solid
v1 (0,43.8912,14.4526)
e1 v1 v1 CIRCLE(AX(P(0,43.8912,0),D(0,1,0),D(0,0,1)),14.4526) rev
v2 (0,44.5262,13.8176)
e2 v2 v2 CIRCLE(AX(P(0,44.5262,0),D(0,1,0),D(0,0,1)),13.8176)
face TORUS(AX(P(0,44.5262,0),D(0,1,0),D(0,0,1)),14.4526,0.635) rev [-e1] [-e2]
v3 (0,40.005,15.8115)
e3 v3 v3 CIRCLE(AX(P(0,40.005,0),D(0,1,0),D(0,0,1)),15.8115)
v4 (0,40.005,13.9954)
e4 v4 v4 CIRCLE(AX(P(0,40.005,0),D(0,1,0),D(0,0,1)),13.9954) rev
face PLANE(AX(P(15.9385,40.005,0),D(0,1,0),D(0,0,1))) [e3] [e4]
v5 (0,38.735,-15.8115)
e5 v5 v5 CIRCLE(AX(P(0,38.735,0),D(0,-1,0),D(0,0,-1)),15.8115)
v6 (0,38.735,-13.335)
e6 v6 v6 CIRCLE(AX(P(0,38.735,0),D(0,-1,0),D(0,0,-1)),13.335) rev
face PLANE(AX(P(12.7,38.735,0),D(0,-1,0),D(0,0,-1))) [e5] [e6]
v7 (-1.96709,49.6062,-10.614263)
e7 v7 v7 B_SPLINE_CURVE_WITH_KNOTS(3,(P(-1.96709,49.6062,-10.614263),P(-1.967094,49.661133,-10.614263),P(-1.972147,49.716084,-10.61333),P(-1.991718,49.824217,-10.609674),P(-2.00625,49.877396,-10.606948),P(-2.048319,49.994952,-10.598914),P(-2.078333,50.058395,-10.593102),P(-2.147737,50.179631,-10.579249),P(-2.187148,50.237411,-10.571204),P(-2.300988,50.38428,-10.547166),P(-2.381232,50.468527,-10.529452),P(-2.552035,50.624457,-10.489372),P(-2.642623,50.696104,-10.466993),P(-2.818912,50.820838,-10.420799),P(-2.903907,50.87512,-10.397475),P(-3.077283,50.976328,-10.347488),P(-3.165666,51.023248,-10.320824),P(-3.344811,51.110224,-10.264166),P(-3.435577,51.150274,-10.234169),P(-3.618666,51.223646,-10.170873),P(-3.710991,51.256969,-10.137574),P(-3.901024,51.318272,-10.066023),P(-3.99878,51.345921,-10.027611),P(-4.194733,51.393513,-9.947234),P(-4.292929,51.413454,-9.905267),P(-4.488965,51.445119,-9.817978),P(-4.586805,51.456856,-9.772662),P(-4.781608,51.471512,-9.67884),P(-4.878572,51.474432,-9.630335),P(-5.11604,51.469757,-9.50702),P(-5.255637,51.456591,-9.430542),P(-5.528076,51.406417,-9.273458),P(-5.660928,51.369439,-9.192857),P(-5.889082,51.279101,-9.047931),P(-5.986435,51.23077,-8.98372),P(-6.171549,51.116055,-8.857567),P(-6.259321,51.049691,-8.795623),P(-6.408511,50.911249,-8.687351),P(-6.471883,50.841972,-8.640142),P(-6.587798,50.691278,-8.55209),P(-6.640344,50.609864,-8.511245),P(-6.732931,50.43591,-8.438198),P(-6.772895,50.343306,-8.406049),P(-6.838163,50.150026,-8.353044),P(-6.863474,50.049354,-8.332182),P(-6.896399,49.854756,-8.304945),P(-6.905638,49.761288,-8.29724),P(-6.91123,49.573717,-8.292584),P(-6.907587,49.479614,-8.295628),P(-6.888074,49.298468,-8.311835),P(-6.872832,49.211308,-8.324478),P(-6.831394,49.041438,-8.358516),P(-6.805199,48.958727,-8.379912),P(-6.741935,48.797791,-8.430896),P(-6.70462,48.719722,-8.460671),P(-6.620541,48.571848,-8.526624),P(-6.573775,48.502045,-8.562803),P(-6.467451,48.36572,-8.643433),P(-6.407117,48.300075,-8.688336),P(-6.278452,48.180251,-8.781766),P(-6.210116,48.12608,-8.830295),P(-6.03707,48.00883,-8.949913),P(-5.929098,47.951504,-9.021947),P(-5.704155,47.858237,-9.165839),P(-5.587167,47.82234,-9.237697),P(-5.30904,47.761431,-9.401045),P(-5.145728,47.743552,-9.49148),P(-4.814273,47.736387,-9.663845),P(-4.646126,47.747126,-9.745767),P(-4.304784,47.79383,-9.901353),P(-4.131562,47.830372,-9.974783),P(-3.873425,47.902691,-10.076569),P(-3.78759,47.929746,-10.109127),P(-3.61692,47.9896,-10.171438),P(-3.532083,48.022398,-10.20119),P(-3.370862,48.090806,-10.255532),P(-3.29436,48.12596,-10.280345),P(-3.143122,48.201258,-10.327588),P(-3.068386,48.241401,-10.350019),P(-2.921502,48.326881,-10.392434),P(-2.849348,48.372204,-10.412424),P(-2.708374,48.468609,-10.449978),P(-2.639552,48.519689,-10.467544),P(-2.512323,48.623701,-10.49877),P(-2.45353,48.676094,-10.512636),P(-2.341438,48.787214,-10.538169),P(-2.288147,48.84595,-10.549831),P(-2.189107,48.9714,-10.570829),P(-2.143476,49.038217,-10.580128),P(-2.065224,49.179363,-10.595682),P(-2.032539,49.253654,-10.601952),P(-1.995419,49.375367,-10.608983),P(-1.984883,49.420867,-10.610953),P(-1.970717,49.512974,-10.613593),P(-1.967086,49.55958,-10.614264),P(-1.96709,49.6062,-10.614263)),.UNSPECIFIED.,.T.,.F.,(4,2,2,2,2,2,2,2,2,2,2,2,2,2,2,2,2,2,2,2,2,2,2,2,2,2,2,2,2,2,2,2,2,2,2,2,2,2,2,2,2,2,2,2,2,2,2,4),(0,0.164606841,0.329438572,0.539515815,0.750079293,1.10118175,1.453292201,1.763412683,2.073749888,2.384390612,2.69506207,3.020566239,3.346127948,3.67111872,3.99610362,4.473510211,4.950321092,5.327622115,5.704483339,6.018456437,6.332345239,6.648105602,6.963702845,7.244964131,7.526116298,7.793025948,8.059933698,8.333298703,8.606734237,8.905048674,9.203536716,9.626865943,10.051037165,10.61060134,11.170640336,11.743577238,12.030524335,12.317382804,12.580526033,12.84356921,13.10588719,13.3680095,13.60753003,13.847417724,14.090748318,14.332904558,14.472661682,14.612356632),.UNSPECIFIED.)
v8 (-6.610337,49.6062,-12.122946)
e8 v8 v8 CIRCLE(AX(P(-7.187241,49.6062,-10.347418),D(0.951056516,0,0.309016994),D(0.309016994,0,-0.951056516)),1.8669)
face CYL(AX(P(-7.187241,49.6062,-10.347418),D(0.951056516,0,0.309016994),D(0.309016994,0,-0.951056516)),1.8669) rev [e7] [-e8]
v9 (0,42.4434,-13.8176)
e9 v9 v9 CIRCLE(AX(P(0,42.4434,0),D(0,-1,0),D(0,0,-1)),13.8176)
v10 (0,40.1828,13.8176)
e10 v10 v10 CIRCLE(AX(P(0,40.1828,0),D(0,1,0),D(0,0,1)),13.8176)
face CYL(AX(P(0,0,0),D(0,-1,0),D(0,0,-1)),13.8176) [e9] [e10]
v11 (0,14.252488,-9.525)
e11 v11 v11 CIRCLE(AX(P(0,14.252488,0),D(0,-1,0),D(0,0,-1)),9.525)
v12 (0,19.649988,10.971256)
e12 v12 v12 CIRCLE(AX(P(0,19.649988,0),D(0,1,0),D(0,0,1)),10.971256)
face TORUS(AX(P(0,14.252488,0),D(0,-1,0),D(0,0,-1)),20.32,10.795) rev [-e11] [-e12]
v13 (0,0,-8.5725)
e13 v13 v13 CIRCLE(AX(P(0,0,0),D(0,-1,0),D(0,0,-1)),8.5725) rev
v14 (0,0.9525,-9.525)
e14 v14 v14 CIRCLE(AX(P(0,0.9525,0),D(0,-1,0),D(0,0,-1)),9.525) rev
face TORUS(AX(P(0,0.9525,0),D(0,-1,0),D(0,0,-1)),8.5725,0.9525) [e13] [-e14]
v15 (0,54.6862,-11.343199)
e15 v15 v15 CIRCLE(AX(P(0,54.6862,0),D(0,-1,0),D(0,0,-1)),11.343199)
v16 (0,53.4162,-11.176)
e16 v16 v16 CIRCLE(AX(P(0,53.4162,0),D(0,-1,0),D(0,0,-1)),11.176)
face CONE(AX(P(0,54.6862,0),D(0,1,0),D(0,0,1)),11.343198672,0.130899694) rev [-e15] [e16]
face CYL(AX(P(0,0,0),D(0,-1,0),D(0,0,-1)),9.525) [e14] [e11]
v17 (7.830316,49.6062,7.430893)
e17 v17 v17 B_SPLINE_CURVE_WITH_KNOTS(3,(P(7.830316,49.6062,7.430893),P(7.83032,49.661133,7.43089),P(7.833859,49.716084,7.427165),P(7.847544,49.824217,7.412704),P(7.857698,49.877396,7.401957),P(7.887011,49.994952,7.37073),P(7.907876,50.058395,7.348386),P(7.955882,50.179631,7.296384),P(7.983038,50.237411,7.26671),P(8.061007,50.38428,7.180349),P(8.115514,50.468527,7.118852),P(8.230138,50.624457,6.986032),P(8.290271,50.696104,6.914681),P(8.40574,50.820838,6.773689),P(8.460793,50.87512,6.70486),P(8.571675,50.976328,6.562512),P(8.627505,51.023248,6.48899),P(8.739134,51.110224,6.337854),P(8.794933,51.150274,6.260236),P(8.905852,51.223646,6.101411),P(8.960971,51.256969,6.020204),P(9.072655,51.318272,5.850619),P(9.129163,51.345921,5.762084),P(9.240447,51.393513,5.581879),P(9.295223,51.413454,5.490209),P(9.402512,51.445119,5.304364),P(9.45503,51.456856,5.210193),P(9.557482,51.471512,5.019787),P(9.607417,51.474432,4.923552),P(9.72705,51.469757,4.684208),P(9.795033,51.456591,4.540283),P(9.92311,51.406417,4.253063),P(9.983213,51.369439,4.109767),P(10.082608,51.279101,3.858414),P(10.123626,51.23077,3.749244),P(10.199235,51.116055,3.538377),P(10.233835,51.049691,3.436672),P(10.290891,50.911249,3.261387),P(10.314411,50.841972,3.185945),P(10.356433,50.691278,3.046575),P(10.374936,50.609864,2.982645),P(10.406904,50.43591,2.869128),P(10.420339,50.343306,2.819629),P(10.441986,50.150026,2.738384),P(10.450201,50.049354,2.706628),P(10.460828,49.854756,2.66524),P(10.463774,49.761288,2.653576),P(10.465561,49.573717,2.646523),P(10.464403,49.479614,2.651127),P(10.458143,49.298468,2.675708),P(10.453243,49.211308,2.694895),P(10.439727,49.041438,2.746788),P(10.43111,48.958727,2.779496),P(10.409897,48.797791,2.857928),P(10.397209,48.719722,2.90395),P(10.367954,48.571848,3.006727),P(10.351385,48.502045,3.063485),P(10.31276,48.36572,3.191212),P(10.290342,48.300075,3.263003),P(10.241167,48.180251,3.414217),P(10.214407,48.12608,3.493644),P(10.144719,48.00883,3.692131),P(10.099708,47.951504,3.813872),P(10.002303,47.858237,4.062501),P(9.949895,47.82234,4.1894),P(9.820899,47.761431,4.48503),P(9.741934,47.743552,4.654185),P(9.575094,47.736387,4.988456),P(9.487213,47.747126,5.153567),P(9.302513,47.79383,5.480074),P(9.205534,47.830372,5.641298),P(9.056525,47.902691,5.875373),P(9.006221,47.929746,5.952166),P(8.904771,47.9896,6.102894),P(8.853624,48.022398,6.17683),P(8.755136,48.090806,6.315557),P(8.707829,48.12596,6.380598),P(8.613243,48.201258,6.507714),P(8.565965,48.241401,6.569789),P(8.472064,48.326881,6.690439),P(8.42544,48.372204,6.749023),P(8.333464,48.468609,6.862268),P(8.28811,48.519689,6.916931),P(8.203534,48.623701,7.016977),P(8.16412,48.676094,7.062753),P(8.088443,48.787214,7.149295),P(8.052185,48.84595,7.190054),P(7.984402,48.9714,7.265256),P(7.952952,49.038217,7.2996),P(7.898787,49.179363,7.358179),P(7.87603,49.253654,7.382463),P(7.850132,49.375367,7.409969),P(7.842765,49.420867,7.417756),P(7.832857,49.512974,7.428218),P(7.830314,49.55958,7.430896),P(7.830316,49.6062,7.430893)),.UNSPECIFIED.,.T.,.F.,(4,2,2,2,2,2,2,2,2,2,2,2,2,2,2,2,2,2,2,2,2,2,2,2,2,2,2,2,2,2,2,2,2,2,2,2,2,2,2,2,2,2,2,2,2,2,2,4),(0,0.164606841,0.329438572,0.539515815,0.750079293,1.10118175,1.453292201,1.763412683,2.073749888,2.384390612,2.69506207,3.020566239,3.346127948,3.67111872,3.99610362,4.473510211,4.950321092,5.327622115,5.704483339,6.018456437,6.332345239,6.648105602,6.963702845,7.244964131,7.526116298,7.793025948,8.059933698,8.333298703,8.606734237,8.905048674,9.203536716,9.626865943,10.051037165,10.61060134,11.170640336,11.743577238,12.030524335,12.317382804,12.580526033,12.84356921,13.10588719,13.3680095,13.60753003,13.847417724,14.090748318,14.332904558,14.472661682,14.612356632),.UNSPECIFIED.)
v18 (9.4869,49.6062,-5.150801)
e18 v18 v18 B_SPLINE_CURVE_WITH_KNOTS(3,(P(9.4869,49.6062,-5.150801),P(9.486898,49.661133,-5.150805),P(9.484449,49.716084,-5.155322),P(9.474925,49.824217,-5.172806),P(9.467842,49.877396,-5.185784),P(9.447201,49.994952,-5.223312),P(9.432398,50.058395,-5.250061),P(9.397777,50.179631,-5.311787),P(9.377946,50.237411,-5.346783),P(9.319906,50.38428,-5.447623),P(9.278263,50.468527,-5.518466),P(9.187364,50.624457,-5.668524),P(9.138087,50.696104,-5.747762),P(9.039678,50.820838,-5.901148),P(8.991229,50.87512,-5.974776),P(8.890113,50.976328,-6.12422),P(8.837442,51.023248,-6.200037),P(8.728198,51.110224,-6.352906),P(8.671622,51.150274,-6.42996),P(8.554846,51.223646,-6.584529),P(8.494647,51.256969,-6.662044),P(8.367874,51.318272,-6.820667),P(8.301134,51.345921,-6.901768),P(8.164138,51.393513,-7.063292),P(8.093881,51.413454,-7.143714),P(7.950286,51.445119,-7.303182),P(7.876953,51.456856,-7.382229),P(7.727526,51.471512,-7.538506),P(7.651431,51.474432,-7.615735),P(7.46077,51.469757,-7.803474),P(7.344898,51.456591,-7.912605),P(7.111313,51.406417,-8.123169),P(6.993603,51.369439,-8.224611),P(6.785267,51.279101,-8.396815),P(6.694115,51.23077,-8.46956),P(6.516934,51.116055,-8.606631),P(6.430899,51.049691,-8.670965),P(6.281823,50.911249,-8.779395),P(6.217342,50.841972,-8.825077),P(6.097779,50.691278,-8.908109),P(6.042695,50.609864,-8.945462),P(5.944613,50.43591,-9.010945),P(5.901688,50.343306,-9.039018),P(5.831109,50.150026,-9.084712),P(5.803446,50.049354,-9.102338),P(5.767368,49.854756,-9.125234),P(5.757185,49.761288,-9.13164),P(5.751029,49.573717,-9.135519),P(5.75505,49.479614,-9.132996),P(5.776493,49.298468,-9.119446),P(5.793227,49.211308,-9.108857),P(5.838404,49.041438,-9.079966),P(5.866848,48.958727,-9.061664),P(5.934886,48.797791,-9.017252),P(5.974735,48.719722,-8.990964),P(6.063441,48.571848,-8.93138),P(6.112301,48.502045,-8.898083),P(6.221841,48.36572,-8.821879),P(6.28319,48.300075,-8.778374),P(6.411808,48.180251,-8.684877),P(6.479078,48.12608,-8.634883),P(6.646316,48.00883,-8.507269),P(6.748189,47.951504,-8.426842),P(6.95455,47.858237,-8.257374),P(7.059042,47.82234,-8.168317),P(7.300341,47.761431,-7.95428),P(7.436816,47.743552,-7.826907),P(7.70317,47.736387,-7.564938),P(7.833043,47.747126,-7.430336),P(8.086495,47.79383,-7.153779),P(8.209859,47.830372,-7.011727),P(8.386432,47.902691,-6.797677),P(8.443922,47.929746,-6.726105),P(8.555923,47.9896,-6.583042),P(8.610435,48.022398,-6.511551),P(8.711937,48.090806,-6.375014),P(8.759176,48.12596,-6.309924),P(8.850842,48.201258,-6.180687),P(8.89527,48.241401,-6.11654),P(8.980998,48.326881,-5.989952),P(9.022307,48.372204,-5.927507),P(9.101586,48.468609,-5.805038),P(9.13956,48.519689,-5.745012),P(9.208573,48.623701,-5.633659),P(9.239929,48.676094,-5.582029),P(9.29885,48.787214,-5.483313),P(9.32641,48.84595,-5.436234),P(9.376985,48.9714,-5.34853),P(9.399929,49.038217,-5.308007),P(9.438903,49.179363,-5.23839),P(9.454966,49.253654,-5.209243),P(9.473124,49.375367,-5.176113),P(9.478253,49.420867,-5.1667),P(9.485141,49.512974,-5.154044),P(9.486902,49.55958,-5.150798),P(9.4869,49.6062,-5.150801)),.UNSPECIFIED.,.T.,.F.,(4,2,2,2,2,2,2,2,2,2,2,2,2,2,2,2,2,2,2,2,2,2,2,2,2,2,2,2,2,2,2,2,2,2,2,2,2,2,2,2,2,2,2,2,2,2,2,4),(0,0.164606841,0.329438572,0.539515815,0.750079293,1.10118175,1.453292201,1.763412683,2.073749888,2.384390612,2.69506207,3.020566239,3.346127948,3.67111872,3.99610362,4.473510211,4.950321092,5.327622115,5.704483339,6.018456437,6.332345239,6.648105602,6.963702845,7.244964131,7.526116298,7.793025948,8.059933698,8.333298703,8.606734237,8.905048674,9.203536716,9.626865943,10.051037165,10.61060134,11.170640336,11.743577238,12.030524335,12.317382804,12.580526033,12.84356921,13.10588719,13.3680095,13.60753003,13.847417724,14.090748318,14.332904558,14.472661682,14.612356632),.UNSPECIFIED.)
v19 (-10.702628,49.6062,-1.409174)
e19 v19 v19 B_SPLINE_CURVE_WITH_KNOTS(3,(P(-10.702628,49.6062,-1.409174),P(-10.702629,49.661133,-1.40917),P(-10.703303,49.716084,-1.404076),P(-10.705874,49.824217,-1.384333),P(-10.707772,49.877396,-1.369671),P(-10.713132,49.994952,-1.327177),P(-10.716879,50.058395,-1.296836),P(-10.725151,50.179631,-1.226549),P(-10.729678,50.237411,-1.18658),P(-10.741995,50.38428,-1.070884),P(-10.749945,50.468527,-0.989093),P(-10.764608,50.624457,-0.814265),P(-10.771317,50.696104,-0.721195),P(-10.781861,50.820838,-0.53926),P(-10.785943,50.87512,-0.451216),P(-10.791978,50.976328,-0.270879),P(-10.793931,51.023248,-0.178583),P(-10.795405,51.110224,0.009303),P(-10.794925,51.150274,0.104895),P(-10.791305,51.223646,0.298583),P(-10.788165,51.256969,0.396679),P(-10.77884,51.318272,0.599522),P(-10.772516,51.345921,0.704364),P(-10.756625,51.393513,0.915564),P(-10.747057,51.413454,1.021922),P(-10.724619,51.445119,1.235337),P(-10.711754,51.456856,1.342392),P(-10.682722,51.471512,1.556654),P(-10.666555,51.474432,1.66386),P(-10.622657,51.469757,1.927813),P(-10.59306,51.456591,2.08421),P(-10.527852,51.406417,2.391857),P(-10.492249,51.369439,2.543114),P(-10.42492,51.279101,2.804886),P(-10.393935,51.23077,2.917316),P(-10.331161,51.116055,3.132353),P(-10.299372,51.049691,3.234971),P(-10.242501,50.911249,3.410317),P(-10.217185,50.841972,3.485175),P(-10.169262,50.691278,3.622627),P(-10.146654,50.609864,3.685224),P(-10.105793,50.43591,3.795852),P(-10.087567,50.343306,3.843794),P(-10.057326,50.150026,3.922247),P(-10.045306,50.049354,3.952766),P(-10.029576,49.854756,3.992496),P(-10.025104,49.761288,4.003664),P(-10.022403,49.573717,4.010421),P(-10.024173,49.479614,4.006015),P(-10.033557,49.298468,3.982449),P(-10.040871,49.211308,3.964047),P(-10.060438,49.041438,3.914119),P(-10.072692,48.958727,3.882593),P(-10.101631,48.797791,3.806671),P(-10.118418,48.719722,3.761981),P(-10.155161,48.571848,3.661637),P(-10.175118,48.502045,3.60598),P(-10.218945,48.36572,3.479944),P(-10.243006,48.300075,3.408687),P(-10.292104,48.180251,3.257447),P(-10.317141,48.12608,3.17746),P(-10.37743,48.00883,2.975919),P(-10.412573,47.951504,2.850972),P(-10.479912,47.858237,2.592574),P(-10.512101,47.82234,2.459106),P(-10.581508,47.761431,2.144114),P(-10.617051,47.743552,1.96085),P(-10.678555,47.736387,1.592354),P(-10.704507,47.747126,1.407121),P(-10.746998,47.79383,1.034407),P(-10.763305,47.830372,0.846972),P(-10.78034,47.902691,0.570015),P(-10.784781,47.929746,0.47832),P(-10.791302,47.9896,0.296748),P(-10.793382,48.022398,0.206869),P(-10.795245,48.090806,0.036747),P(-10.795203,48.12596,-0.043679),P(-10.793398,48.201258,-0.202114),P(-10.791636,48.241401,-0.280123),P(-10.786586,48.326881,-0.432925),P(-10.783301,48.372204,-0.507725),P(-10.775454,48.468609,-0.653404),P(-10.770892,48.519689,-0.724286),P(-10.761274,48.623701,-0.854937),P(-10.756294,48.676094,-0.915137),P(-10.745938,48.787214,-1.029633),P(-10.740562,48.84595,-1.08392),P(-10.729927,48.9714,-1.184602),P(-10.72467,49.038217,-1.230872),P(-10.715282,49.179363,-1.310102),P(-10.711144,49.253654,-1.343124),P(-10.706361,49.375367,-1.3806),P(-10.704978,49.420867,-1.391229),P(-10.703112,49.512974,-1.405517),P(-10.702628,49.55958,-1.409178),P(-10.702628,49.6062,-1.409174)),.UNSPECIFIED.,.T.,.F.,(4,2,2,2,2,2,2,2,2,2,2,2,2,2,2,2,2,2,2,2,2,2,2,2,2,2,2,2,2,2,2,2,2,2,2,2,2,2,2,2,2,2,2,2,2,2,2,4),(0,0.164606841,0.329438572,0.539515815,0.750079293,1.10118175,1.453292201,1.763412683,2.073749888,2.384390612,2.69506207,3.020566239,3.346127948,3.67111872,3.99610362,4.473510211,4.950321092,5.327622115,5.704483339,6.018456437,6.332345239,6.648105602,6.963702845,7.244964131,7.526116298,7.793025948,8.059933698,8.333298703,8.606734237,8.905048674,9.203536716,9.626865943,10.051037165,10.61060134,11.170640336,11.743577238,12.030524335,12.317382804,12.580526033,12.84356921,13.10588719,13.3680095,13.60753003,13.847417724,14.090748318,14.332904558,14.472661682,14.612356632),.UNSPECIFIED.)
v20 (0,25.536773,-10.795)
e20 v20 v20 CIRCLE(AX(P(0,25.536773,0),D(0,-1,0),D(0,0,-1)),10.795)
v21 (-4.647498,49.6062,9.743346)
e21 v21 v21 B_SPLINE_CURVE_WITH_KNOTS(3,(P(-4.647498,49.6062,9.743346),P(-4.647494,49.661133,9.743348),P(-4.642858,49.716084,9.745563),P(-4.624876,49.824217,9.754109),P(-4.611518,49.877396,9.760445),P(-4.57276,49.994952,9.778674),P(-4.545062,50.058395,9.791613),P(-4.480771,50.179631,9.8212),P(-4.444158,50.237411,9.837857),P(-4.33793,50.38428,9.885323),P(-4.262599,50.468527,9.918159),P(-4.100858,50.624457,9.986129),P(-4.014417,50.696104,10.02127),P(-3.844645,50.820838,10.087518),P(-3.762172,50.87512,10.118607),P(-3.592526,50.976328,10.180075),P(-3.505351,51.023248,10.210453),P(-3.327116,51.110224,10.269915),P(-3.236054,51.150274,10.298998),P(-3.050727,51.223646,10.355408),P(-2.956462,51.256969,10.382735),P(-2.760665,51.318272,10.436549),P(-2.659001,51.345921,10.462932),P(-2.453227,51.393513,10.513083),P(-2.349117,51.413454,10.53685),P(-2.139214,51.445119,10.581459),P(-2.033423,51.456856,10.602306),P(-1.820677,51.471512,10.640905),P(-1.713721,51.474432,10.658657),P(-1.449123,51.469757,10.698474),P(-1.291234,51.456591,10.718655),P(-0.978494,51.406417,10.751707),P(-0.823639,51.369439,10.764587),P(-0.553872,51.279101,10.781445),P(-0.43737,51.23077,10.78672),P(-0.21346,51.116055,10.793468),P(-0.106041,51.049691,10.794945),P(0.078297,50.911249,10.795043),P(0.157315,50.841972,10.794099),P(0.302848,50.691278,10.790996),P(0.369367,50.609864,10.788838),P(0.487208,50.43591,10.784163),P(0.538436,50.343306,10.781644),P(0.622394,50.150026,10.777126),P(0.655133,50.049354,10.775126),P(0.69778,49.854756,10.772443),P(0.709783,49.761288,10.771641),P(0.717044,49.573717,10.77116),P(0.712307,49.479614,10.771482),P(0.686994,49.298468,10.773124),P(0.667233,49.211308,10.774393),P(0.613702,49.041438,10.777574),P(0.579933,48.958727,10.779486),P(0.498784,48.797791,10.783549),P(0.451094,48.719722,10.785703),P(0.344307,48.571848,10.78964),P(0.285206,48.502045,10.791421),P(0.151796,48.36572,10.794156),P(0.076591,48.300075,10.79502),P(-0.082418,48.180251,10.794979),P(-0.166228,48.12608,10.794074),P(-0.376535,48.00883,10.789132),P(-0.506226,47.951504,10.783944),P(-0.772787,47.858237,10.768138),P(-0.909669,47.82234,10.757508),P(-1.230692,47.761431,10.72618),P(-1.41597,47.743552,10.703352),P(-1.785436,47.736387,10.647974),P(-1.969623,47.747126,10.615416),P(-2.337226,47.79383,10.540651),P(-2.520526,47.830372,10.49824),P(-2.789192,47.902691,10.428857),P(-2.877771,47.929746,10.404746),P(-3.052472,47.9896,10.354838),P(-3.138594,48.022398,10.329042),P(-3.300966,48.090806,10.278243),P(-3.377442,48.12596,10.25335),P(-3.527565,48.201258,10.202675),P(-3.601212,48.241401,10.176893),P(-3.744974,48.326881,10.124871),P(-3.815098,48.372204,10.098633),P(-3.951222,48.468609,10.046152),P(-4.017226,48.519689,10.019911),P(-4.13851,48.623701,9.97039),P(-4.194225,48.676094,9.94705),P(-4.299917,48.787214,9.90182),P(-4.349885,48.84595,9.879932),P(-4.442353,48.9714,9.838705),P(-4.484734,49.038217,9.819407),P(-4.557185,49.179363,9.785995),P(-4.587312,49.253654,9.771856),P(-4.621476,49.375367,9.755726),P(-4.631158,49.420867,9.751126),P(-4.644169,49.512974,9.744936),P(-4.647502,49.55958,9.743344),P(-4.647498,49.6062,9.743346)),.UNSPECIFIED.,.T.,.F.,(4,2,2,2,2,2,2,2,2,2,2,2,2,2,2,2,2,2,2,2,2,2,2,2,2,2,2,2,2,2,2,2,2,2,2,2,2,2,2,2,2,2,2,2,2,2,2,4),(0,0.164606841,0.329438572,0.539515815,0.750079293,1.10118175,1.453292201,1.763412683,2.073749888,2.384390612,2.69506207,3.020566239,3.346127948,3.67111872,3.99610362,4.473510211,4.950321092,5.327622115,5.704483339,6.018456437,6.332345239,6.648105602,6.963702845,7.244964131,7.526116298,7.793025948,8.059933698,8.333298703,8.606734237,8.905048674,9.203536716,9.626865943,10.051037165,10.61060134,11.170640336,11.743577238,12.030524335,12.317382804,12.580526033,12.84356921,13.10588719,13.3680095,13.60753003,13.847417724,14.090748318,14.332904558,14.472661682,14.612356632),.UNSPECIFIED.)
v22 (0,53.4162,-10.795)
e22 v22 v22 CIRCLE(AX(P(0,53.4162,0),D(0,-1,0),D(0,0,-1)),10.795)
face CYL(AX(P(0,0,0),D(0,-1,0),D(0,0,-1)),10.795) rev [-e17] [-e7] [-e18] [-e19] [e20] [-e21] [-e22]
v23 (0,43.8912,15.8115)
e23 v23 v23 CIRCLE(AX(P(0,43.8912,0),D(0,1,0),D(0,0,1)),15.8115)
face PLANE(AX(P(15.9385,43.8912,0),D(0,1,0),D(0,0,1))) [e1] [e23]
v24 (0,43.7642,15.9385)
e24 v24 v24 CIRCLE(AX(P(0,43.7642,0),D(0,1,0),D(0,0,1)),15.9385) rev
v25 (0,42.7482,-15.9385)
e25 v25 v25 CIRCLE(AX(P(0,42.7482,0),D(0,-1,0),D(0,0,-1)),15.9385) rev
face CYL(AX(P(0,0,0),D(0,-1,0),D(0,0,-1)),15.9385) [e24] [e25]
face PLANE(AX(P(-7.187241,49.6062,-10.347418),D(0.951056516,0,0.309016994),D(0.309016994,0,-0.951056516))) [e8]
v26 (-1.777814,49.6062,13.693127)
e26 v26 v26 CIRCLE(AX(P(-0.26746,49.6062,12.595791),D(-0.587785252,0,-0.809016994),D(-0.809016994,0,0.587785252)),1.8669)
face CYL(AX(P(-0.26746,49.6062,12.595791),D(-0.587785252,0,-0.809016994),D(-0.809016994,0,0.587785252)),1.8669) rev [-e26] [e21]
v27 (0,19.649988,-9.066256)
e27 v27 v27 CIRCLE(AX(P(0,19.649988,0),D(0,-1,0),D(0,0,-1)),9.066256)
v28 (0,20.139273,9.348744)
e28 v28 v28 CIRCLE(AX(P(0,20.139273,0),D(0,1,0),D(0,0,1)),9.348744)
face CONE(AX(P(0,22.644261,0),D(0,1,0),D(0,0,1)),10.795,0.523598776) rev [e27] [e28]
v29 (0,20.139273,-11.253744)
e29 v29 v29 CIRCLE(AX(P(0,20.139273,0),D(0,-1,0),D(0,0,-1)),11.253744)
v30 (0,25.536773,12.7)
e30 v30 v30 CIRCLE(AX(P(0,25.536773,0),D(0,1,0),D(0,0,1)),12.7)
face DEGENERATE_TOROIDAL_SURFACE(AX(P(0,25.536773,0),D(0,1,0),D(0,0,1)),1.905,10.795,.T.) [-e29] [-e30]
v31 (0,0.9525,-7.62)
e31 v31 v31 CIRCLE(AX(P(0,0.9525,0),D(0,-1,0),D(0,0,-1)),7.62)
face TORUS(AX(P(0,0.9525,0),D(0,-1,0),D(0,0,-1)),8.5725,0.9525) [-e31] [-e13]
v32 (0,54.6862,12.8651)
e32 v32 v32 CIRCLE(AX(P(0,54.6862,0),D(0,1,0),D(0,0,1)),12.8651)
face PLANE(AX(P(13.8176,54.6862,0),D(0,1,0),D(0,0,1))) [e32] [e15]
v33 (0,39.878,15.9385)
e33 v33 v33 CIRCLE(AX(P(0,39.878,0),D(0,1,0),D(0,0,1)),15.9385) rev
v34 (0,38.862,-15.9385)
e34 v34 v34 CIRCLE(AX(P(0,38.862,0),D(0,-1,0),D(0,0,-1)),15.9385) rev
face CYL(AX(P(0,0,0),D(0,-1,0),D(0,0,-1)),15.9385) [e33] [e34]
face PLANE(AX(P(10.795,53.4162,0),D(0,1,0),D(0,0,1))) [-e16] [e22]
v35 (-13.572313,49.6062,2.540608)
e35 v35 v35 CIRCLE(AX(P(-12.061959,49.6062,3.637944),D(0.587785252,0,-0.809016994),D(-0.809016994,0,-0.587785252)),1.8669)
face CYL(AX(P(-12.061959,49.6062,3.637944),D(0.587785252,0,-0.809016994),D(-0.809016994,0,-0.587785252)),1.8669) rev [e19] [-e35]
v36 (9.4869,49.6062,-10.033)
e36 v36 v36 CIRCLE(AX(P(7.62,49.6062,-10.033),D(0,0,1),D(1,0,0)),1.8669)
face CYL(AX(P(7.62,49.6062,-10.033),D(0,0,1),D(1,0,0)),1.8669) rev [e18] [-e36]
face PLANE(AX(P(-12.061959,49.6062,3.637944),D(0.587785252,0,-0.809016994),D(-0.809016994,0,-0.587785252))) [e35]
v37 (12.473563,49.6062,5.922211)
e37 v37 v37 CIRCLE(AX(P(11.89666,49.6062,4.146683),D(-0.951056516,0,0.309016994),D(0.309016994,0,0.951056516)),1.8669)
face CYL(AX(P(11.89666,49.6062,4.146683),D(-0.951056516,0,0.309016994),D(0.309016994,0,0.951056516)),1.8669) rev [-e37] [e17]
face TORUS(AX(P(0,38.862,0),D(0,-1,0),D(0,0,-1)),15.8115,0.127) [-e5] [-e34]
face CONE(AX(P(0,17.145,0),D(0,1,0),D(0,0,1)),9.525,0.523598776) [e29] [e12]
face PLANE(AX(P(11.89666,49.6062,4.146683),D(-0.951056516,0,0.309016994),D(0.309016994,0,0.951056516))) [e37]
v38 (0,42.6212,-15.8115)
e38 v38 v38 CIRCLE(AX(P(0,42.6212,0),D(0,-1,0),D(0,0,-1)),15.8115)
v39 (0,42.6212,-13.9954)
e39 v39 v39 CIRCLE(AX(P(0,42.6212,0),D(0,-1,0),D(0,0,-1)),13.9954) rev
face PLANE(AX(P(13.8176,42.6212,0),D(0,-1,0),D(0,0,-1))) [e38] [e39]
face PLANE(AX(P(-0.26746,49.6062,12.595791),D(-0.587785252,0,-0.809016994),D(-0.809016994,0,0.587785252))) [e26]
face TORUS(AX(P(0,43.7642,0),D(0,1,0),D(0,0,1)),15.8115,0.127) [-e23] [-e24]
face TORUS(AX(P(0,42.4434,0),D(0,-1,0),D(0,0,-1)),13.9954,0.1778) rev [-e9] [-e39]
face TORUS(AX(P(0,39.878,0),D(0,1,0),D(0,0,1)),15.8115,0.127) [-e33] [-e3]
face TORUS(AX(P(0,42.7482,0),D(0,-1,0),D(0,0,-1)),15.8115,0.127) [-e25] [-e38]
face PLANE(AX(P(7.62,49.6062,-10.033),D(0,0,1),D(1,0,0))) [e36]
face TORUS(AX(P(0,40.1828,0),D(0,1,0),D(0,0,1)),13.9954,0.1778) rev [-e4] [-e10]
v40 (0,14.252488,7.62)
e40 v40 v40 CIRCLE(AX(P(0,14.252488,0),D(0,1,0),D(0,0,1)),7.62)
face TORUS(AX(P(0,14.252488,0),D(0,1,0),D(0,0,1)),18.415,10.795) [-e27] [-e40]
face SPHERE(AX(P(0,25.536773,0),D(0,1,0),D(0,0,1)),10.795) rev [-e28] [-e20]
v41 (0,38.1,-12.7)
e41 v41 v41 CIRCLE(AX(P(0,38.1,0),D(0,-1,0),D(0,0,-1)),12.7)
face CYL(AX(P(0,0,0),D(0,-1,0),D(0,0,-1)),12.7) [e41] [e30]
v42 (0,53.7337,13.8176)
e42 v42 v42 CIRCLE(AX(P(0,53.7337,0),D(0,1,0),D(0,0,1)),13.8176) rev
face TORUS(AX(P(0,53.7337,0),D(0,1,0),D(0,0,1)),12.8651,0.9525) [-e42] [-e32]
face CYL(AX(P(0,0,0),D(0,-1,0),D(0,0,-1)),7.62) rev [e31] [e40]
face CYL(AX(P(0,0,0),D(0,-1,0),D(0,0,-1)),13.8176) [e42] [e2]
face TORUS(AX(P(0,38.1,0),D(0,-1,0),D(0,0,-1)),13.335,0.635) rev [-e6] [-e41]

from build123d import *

# Parameters (mm, degrees)
O_RING_GLAND_R1_R     = 0.1778
O_RING_GLAND_R2_R     = 0.127
O_RING_GLAND_ROUNDS_R = 0.635
TOP_BOTTOM_ROUNDS_R   = 0.9525
FLOW_ROUNDS_R         = 10.795
SKETCH3_R             = 1.8669
CUT_EXTRUDE1_DEPTH    = 10.033
CIRPATTERN1_COUNT     = 5


with BuildPart() as part:
    # Sketch2 → Revolve1 (revolve)
    with BuildSketch(Plane.XY, mode=Mode.PRIVATE) as revolve1_sk:
        Polygon((7.62, 0), (7.62, 17.145), (10.795, 22.644261314), (10.795, 53.4162), (11.176, 53.4162), (11.343198672, 54.6862), (13.8176, 54.6862), (13.8176, 43.8912), (15.9385, 43.8912), (15.9385, 42.6212), (13.8176, 42.6212), (13.8176, 40.005), (15.9385, 40.005), (15.9385, 38.735), (12.7, 38.735), (12.7, 22.644261314), (9.525, 17.145), (9.525, 0), align=None)
    revolve(revolve1_sk.sketch.rotate(Axis((0, 0, 0), (0, 1, 0)), 90), axis=Axis((0, 0, 0), (0, 1, 0)))

    # O-Ring Gland R1
    o_ring_gland_r1_edges = [part.edges().sort_by_distance(p)[0] for p in [
        (0, 42.6212, 13.8176),
        (0, 40.005, 13.8176),
    ]]
    fillet(o_ring_gland_r1_edges, radius=O_RING_GLAND_R1_R)

    # O-Ring Gland R2
    o_ring_gland_r2_edges = [part.edges().sort_by_distance(p)[0] for p in [
        (0, 43.8912, 15.9385),
        (0, 42.6212, 15.9385),
        (0, 40.005, 15.9385),
        (0, 38.735, 15.9385),
    ]]
    fillet(o_ring_gland_r2_edges, radius=O_RING_GLAND_R2_R)

    # O-Ring Gland Rounds
    o_ring_gland_rounds_edges = [part.edges().sort_by_distance(p)[0] for p in [
        (0, 43.8912, 13.8176),
        (0, 38.735, 12.7),
    ]]
    fillet(o_ring_gland_rounds_edges, radius=O_RING_GLAND_ROUNDS_R)

    # Top/Bottom Rounds
    top_bottom_rounds_edges = [part.edges().sort_by_distance(p)[0] for p in [
        (0, 0, 7.62),
        (0, 54.6862, 13.8176),
        (0, 0, 9.525),
    ]]
    fillet(top_bottom_rounds_edges, radius=TOP_BOTTOM_ROUNDS_R - 0.0001)  # a hair under: the kernel refuses the full size

    # Flow Rounds
    flow_rounds_edges = [part.edges().sort_by_distance(p)[0] for p in [
        (0, 17.145, 7.62),
        (0, 22.644261314, 10.795),
        (0, 22.644261314, 12.7),
        (0, 17.145, 9.525),
    ]]
    fillet(flow_rounds_edges, radius=FLOW_ROUNDS_R)

    # Sketch3 → Cut-Extrude1 (cut)
    with BuildSketch(Plane.XY):
        with Locations((7.62, 49.6062)):
            Circle(SKETCH3_R)
    cut_extrude1 = extrude(amount=-CUT_EXTRUDE1_DEPTH, mode=Mode.SUBTRACT)

    # CirPattern1: Cut-Extrude1 ×5 about axis
    cirpattern1_axis = Axis((0, 0, 0), (0, 1, 0))
    for i in range(1, CIRPATTERN1_COUNT):
        add(cut_extrude1.rotate(cirpattern1_axis, i * 360 / CIRPATTERN1_COUNT), mode=Mode.SUBTRACT)


solid = part.part
